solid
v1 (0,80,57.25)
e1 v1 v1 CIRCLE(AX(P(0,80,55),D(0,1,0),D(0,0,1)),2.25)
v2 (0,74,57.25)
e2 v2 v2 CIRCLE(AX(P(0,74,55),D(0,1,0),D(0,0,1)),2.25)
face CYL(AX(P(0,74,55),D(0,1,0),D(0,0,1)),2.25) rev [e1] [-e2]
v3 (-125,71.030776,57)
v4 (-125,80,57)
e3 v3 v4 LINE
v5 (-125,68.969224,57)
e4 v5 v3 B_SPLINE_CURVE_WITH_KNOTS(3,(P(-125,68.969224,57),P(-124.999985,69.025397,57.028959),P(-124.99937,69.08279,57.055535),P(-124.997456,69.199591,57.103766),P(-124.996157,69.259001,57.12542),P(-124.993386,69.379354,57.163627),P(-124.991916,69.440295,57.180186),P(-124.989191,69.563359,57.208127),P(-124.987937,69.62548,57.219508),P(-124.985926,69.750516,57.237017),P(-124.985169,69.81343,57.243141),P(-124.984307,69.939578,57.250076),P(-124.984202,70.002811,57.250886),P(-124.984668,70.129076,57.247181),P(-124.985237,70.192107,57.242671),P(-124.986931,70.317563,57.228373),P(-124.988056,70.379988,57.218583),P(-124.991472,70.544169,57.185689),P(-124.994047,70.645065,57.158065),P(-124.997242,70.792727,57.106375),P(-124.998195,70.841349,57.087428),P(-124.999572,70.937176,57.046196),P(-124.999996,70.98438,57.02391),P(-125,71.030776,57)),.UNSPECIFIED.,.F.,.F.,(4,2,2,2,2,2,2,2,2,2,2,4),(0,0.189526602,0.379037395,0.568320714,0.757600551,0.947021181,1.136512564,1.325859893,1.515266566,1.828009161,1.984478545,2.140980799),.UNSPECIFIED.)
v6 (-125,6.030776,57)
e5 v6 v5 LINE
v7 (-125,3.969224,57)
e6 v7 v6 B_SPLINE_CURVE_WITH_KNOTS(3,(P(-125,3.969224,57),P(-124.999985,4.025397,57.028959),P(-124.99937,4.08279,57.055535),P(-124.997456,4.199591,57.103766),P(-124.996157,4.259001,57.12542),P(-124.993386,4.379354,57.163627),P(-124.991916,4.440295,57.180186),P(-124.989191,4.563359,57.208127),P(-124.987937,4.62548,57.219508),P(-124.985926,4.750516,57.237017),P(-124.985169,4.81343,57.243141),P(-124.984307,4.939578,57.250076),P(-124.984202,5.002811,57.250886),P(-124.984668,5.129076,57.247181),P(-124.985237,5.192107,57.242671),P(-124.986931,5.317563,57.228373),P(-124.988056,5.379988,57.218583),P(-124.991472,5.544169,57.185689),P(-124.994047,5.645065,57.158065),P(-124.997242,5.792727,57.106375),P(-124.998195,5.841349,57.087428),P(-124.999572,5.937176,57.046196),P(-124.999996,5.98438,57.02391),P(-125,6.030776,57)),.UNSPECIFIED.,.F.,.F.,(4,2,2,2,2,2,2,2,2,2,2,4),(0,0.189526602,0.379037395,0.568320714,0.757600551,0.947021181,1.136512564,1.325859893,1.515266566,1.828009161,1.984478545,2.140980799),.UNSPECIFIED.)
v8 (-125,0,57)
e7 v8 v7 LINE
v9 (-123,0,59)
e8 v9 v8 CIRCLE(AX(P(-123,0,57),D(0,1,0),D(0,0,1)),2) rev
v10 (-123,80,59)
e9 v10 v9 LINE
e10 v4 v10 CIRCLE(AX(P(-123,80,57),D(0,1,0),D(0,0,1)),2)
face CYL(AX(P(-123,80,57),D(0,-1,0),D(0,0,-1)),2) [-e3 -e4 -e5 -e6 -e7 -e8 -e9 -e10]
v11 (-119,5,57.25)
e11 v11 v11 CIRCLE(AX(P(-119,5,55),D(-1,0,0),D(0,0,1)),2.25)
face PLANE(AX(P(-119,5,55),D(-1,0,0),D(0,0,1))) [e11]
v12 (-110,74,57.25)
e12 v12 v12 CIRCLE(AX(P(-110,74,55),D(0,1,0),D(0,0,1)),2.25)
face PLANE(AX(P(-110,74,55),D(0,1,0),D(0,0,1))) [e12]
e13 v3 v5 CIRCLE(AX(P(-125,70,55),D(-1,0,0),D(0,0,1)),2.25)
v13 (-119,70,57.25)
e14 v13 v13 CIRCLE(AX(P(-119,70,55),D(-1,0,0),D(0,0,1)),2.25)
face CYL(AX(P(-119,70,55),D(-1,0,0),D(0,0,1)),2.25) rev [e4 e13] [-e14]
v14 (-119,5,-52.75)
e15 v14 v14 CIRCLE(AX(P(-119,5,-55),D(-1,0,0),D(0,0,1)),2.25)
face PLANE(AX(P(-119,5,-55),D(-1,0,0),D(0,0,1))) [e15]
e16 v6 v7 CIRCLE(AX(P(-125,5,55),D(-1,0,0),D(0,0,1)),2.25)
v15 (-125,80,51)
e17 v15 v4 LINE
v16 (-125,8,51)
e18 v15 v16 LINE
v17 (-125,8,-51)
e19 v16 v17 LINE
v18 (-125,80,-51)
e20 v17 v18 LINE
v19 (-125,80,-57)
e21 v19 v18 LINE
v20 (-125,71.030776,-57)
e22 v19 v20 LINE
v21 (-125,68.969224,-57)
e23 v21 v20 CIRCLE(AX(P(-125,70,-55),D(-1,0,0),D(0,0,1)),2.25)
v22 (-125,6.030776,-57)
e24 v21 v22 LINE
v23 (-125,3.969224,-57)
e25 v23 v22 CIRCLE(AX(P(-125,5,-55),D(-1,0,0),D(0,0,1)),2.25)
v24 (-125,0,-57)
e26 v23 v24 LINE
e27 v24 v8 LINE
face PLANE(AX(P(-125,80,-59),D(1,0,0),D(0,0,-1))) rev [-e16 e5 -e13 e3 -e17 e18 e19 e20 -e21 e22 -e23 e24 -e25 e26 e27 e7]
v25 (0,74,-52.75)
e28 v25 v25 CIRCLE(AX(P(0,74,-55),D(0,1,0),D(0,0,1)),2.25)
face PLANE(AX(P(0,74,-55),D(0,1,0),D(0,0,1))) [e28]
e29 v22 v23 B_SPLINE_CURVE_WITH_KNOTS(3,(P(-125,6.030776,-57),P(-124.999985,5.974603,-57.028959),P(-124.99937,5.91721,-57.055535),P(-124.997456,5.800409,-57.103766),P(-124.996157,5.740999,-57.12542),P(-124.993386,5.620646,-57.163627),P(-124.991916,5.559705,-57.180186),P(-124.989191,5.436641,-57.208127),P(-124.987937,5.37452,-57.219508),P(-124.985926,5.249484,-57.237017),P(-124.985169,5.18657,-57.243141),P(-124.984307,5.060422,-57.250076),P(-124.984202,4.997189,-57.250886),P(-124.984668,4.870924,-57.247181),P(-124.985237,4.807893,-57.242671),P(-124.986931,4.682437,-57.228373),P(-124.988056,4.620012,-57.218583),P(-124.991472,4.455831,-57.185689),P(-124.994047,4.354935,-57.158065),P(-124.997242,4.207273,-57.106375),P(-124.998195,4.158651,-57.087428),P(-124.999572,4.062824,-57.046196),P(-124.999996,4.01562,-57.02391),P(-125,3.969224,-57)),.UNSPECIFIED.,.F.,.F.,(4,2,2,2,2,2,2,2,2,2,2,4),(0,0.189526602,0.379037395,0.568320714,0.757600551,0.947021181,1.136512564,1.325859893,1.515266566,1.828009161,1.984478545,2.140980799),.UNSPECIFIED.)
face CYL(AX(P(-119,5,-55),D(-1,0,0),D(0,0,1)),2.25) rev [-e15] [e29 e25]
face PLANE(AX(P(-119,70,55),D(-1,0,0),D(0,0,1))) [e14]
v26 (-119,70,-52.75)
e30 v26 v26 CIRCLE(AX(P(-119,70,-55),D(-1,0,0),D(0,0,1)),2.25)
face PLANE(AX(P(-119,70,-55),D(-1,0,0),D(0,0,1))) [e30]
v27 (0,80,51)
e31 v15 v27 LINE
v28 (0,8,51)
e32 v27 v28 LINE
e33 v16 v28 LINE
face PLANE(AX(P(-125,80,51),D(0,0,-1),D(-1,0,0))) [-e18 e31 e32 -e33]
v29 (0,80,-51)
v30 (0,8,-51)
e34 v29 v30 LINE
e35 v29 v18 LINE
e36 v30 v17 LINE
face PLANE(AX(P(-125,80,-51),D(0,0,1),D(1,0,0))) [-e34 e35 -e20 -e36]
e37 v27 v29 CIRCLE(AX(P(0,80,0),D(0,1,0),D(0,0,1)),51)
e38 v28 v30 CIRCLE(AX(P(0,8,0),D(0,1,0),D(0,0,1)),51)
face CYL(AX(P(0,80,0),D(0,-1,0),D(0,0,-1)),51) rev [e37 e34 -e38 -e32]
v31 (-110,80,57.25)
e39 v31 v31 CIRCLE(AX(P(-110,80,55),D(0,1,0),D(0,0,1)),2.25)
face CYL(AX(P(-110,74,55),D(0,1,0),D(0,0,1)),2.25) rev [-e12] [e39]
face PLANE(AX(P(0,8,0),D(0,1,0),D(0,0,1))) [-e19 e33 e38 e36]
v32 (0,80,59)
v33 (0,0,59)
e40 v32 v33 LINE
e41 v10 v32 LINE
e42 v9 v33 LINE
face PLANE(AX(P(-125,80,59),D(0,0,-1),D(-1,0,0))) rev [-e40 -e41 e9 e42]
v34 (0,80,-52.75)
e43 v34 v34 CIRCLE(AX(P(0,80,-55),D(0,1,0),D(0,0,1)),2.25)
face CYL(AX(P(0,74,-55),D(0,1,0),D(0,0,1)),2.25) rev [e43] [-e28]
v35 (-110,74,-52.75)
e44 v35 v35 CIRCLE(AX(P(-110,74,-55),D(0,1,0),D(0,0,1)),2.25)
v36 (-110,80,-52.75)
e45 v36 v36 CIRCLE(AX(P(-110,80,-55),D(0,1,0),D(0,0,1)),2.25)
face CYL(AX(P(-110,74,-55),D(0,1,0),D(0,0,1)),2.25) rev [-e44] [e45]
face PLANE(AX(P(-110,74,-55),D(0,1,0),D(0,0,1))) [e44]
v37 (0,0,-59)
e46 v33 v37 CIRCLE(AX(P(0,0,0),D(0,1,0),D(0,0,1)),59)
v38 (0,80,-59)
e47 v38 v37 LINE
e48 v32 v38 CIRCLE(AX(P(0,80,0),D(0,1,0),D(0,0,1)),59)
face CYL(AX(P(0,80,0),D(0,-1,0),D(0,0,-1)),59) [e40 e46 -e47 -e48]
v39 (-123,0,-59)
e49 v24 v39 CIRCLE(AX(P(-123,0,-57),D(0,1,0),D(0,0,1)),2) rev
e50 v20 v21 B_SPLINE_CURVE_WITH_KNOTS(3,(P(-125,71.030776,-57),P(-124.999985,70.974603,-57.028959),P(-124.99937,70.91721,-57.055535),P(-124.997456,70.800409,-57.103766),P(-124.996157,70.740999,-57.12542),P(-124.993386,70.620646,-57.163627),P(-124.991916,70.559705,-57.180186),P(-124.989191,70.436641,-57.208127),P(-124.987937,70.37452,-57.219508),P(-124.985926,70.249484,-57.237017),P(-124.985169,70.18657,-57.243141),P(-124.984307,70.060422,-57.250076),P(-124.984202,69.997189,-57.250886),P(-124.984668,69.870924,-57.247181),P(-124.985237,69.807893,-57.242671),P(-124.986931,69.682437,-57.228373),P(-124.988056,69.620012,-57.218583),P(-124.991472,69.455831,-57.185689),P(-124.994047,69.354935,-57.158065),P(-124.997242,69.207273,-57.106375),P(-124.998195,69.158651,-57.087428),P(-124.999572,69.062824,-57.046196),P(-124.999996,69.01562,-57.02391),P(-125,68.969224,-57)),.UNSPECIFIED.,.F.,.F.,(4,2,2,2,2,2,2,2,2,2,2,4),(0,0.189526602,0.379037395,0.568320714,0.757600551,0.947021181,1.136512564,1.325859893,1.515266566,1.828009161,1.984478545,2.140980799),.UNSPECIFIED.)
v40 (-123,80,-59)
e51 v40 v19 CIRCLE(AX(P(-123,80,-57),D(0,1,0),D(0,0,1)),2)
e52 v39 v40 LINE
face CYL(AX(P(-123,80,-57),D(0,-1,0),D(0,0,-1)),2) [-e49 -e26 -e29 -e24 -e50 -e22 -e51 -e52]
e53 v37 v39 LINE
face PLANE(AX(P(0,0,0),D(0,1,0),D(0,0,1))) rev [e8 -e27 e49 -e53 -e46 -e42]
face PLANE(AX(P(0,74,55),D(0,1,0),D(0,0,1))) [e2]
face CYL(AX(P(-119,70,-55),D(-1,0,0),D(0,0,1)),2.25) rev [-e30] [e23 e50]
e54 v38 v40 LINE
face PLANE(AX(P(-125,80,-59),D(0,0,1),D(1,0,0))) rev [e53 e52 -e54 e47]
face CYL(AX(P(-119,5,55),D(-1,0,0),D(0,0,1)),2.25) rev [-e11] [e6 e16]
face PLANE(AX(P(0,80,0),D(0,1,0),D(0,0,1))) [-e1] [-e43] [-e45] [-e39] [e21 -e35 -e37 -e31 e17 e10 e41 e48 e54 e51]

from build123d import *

# Parameters (mm, degrees)
BOTTOMEXTRUDE_DEPTH = 80
SHELL1_T            = -8
SKETCH3_W           = 102
SKETCH3_H           = 72
CUT_EXTRUDE1_DEPTH  = 160.70597985
SKETCH4_R           = 2.25
CUT_EXTRUDE2_DEPTH  = 6
SKETCH5_R           = 2.25
CUT_EXTRUDE3_DEPTH  = 6
FILLET2_R           = 2
FILLET3_R           = 2


with BuildPart() as part:
    # Sketch2 → BottomExtrude (new body)
    with BuildSketch(Plane(origin=(0, 0, 0), x_dir=(1, 0, 0), z_dir=(0, 1, 0))):
        with BuildLine():
            Line((-125, 59), (0, 59))
            ThreePointArc((0, 59), (59, 0), (0, -59))
            Line((0, -59), (-125, -59))
            Line((-125, -59), (-125, 59))
        make_face()
    extrude(amount=BOTTOMEXTRUDE_DEPTH)

    # Shell1
    shell1_openings = [part.faces().sort_by_distance(p)[0] for p in [
        (-38.824706597, 80, 0),
    ]]
    offset(amount=SHELL1_T, openings=shell1_openings, kind=Kind.INTERSECTION)

    # Sketch3 → Cut-Extrude1 (cut, through all)
    with BuildSketch(Plane(origin=(0, 0, 0), x_dir=(0, 0, -1), z_dir=(1, 0, 0))):
        with Locations((0, 44)):
            Rectangle(SKETCH3_W, SKETCH3_H)
    extrude(amount=-CUT_EXTRUDE1_DEPTH, mode=Mode.SUBTRACT)

    # Sketch4 → Cut-Extrude2 (cut)
    with BuildSketch(Plane.ZY.offset(125)):
        with Locations((-55, 70)):
            Circle(SKETCH4_R)
        with Locations((55, 70)):
            Circle(SKETCH4_R)
        with Locations((55, 5)):
            Circle(SKETCH4_R)
        with Locations((-55, 5)):
            Circle(SKETCH4_R)
    extrude(amount=-CUT_EXTRUDE2_DEPTH, mode=Mode.SUBTRACT)

    # Sketch5 → Cut-Extrude3 (cut)
    with BuildSketch(Plane(origin=(0, 80, 0), x_dir=(1, 0, 0), z_dir=(0, 1, 0))):
        with Locations(Location((0, 55, 0), (0, 0, 270))):
            Circle(SKETCH5_R)
        with Locations(Location((-110, 55, 0), (0, 0, 270))):
            Circle(SKETCH5_R)
        with Locations(Location((-110, -55, 0), (0, 0, 270))):
            Circle(SKETCH5_R)
        with Locations(Location((0, -55, 0), (0, 0, 270))):
            Circle(SKETCH5_R)
    extrude(amount=-CUT_EXTRUDE3_DEPTH, mode=Mode.SUBTRACT)

    # Fillet2
    # the kernel refuses this fillet: 2 mm, written as the material it takes off along each edge
    with BuildSketch(Plane(origin=(-125, -5, -59), x_dir=(0, 0, 1), z_dir=(0, 1, 0))) as fillet2_piece_1:
        with BuildLine():
            CenterArc((FILLET2_R, FILLET2_R), FILLET2_R, 180, 90)
            Line((0, FILLET2_R), (0, 0))
            Line((0, 0), (FILLET2_R, 0))
        make_face()
    extrude(amount=90, mode=Mode.SUBTRACT)

    # Fillet3
    # the kernel refuses this fillet: 2 mm, written as the material it takes off along each edge
    with BuildSketch(Plane(origin=(-125, -5, 59), x_dir=(1, 0, 0), z_dir=(0, 1, 0))) as fillet3_piece_1:
        with BuildLine():
            CenterArc((FILLET3_R, FILLET3_R), FILLET3_R, 180, 90)
            Line((0, FILLET3_R), (0, 0))
            Line((0, 0), (FILLET3_R, 0))
        make_face()
    extrude(amount=90, mode=Mode.SUBTRACT)


solid = part.part
